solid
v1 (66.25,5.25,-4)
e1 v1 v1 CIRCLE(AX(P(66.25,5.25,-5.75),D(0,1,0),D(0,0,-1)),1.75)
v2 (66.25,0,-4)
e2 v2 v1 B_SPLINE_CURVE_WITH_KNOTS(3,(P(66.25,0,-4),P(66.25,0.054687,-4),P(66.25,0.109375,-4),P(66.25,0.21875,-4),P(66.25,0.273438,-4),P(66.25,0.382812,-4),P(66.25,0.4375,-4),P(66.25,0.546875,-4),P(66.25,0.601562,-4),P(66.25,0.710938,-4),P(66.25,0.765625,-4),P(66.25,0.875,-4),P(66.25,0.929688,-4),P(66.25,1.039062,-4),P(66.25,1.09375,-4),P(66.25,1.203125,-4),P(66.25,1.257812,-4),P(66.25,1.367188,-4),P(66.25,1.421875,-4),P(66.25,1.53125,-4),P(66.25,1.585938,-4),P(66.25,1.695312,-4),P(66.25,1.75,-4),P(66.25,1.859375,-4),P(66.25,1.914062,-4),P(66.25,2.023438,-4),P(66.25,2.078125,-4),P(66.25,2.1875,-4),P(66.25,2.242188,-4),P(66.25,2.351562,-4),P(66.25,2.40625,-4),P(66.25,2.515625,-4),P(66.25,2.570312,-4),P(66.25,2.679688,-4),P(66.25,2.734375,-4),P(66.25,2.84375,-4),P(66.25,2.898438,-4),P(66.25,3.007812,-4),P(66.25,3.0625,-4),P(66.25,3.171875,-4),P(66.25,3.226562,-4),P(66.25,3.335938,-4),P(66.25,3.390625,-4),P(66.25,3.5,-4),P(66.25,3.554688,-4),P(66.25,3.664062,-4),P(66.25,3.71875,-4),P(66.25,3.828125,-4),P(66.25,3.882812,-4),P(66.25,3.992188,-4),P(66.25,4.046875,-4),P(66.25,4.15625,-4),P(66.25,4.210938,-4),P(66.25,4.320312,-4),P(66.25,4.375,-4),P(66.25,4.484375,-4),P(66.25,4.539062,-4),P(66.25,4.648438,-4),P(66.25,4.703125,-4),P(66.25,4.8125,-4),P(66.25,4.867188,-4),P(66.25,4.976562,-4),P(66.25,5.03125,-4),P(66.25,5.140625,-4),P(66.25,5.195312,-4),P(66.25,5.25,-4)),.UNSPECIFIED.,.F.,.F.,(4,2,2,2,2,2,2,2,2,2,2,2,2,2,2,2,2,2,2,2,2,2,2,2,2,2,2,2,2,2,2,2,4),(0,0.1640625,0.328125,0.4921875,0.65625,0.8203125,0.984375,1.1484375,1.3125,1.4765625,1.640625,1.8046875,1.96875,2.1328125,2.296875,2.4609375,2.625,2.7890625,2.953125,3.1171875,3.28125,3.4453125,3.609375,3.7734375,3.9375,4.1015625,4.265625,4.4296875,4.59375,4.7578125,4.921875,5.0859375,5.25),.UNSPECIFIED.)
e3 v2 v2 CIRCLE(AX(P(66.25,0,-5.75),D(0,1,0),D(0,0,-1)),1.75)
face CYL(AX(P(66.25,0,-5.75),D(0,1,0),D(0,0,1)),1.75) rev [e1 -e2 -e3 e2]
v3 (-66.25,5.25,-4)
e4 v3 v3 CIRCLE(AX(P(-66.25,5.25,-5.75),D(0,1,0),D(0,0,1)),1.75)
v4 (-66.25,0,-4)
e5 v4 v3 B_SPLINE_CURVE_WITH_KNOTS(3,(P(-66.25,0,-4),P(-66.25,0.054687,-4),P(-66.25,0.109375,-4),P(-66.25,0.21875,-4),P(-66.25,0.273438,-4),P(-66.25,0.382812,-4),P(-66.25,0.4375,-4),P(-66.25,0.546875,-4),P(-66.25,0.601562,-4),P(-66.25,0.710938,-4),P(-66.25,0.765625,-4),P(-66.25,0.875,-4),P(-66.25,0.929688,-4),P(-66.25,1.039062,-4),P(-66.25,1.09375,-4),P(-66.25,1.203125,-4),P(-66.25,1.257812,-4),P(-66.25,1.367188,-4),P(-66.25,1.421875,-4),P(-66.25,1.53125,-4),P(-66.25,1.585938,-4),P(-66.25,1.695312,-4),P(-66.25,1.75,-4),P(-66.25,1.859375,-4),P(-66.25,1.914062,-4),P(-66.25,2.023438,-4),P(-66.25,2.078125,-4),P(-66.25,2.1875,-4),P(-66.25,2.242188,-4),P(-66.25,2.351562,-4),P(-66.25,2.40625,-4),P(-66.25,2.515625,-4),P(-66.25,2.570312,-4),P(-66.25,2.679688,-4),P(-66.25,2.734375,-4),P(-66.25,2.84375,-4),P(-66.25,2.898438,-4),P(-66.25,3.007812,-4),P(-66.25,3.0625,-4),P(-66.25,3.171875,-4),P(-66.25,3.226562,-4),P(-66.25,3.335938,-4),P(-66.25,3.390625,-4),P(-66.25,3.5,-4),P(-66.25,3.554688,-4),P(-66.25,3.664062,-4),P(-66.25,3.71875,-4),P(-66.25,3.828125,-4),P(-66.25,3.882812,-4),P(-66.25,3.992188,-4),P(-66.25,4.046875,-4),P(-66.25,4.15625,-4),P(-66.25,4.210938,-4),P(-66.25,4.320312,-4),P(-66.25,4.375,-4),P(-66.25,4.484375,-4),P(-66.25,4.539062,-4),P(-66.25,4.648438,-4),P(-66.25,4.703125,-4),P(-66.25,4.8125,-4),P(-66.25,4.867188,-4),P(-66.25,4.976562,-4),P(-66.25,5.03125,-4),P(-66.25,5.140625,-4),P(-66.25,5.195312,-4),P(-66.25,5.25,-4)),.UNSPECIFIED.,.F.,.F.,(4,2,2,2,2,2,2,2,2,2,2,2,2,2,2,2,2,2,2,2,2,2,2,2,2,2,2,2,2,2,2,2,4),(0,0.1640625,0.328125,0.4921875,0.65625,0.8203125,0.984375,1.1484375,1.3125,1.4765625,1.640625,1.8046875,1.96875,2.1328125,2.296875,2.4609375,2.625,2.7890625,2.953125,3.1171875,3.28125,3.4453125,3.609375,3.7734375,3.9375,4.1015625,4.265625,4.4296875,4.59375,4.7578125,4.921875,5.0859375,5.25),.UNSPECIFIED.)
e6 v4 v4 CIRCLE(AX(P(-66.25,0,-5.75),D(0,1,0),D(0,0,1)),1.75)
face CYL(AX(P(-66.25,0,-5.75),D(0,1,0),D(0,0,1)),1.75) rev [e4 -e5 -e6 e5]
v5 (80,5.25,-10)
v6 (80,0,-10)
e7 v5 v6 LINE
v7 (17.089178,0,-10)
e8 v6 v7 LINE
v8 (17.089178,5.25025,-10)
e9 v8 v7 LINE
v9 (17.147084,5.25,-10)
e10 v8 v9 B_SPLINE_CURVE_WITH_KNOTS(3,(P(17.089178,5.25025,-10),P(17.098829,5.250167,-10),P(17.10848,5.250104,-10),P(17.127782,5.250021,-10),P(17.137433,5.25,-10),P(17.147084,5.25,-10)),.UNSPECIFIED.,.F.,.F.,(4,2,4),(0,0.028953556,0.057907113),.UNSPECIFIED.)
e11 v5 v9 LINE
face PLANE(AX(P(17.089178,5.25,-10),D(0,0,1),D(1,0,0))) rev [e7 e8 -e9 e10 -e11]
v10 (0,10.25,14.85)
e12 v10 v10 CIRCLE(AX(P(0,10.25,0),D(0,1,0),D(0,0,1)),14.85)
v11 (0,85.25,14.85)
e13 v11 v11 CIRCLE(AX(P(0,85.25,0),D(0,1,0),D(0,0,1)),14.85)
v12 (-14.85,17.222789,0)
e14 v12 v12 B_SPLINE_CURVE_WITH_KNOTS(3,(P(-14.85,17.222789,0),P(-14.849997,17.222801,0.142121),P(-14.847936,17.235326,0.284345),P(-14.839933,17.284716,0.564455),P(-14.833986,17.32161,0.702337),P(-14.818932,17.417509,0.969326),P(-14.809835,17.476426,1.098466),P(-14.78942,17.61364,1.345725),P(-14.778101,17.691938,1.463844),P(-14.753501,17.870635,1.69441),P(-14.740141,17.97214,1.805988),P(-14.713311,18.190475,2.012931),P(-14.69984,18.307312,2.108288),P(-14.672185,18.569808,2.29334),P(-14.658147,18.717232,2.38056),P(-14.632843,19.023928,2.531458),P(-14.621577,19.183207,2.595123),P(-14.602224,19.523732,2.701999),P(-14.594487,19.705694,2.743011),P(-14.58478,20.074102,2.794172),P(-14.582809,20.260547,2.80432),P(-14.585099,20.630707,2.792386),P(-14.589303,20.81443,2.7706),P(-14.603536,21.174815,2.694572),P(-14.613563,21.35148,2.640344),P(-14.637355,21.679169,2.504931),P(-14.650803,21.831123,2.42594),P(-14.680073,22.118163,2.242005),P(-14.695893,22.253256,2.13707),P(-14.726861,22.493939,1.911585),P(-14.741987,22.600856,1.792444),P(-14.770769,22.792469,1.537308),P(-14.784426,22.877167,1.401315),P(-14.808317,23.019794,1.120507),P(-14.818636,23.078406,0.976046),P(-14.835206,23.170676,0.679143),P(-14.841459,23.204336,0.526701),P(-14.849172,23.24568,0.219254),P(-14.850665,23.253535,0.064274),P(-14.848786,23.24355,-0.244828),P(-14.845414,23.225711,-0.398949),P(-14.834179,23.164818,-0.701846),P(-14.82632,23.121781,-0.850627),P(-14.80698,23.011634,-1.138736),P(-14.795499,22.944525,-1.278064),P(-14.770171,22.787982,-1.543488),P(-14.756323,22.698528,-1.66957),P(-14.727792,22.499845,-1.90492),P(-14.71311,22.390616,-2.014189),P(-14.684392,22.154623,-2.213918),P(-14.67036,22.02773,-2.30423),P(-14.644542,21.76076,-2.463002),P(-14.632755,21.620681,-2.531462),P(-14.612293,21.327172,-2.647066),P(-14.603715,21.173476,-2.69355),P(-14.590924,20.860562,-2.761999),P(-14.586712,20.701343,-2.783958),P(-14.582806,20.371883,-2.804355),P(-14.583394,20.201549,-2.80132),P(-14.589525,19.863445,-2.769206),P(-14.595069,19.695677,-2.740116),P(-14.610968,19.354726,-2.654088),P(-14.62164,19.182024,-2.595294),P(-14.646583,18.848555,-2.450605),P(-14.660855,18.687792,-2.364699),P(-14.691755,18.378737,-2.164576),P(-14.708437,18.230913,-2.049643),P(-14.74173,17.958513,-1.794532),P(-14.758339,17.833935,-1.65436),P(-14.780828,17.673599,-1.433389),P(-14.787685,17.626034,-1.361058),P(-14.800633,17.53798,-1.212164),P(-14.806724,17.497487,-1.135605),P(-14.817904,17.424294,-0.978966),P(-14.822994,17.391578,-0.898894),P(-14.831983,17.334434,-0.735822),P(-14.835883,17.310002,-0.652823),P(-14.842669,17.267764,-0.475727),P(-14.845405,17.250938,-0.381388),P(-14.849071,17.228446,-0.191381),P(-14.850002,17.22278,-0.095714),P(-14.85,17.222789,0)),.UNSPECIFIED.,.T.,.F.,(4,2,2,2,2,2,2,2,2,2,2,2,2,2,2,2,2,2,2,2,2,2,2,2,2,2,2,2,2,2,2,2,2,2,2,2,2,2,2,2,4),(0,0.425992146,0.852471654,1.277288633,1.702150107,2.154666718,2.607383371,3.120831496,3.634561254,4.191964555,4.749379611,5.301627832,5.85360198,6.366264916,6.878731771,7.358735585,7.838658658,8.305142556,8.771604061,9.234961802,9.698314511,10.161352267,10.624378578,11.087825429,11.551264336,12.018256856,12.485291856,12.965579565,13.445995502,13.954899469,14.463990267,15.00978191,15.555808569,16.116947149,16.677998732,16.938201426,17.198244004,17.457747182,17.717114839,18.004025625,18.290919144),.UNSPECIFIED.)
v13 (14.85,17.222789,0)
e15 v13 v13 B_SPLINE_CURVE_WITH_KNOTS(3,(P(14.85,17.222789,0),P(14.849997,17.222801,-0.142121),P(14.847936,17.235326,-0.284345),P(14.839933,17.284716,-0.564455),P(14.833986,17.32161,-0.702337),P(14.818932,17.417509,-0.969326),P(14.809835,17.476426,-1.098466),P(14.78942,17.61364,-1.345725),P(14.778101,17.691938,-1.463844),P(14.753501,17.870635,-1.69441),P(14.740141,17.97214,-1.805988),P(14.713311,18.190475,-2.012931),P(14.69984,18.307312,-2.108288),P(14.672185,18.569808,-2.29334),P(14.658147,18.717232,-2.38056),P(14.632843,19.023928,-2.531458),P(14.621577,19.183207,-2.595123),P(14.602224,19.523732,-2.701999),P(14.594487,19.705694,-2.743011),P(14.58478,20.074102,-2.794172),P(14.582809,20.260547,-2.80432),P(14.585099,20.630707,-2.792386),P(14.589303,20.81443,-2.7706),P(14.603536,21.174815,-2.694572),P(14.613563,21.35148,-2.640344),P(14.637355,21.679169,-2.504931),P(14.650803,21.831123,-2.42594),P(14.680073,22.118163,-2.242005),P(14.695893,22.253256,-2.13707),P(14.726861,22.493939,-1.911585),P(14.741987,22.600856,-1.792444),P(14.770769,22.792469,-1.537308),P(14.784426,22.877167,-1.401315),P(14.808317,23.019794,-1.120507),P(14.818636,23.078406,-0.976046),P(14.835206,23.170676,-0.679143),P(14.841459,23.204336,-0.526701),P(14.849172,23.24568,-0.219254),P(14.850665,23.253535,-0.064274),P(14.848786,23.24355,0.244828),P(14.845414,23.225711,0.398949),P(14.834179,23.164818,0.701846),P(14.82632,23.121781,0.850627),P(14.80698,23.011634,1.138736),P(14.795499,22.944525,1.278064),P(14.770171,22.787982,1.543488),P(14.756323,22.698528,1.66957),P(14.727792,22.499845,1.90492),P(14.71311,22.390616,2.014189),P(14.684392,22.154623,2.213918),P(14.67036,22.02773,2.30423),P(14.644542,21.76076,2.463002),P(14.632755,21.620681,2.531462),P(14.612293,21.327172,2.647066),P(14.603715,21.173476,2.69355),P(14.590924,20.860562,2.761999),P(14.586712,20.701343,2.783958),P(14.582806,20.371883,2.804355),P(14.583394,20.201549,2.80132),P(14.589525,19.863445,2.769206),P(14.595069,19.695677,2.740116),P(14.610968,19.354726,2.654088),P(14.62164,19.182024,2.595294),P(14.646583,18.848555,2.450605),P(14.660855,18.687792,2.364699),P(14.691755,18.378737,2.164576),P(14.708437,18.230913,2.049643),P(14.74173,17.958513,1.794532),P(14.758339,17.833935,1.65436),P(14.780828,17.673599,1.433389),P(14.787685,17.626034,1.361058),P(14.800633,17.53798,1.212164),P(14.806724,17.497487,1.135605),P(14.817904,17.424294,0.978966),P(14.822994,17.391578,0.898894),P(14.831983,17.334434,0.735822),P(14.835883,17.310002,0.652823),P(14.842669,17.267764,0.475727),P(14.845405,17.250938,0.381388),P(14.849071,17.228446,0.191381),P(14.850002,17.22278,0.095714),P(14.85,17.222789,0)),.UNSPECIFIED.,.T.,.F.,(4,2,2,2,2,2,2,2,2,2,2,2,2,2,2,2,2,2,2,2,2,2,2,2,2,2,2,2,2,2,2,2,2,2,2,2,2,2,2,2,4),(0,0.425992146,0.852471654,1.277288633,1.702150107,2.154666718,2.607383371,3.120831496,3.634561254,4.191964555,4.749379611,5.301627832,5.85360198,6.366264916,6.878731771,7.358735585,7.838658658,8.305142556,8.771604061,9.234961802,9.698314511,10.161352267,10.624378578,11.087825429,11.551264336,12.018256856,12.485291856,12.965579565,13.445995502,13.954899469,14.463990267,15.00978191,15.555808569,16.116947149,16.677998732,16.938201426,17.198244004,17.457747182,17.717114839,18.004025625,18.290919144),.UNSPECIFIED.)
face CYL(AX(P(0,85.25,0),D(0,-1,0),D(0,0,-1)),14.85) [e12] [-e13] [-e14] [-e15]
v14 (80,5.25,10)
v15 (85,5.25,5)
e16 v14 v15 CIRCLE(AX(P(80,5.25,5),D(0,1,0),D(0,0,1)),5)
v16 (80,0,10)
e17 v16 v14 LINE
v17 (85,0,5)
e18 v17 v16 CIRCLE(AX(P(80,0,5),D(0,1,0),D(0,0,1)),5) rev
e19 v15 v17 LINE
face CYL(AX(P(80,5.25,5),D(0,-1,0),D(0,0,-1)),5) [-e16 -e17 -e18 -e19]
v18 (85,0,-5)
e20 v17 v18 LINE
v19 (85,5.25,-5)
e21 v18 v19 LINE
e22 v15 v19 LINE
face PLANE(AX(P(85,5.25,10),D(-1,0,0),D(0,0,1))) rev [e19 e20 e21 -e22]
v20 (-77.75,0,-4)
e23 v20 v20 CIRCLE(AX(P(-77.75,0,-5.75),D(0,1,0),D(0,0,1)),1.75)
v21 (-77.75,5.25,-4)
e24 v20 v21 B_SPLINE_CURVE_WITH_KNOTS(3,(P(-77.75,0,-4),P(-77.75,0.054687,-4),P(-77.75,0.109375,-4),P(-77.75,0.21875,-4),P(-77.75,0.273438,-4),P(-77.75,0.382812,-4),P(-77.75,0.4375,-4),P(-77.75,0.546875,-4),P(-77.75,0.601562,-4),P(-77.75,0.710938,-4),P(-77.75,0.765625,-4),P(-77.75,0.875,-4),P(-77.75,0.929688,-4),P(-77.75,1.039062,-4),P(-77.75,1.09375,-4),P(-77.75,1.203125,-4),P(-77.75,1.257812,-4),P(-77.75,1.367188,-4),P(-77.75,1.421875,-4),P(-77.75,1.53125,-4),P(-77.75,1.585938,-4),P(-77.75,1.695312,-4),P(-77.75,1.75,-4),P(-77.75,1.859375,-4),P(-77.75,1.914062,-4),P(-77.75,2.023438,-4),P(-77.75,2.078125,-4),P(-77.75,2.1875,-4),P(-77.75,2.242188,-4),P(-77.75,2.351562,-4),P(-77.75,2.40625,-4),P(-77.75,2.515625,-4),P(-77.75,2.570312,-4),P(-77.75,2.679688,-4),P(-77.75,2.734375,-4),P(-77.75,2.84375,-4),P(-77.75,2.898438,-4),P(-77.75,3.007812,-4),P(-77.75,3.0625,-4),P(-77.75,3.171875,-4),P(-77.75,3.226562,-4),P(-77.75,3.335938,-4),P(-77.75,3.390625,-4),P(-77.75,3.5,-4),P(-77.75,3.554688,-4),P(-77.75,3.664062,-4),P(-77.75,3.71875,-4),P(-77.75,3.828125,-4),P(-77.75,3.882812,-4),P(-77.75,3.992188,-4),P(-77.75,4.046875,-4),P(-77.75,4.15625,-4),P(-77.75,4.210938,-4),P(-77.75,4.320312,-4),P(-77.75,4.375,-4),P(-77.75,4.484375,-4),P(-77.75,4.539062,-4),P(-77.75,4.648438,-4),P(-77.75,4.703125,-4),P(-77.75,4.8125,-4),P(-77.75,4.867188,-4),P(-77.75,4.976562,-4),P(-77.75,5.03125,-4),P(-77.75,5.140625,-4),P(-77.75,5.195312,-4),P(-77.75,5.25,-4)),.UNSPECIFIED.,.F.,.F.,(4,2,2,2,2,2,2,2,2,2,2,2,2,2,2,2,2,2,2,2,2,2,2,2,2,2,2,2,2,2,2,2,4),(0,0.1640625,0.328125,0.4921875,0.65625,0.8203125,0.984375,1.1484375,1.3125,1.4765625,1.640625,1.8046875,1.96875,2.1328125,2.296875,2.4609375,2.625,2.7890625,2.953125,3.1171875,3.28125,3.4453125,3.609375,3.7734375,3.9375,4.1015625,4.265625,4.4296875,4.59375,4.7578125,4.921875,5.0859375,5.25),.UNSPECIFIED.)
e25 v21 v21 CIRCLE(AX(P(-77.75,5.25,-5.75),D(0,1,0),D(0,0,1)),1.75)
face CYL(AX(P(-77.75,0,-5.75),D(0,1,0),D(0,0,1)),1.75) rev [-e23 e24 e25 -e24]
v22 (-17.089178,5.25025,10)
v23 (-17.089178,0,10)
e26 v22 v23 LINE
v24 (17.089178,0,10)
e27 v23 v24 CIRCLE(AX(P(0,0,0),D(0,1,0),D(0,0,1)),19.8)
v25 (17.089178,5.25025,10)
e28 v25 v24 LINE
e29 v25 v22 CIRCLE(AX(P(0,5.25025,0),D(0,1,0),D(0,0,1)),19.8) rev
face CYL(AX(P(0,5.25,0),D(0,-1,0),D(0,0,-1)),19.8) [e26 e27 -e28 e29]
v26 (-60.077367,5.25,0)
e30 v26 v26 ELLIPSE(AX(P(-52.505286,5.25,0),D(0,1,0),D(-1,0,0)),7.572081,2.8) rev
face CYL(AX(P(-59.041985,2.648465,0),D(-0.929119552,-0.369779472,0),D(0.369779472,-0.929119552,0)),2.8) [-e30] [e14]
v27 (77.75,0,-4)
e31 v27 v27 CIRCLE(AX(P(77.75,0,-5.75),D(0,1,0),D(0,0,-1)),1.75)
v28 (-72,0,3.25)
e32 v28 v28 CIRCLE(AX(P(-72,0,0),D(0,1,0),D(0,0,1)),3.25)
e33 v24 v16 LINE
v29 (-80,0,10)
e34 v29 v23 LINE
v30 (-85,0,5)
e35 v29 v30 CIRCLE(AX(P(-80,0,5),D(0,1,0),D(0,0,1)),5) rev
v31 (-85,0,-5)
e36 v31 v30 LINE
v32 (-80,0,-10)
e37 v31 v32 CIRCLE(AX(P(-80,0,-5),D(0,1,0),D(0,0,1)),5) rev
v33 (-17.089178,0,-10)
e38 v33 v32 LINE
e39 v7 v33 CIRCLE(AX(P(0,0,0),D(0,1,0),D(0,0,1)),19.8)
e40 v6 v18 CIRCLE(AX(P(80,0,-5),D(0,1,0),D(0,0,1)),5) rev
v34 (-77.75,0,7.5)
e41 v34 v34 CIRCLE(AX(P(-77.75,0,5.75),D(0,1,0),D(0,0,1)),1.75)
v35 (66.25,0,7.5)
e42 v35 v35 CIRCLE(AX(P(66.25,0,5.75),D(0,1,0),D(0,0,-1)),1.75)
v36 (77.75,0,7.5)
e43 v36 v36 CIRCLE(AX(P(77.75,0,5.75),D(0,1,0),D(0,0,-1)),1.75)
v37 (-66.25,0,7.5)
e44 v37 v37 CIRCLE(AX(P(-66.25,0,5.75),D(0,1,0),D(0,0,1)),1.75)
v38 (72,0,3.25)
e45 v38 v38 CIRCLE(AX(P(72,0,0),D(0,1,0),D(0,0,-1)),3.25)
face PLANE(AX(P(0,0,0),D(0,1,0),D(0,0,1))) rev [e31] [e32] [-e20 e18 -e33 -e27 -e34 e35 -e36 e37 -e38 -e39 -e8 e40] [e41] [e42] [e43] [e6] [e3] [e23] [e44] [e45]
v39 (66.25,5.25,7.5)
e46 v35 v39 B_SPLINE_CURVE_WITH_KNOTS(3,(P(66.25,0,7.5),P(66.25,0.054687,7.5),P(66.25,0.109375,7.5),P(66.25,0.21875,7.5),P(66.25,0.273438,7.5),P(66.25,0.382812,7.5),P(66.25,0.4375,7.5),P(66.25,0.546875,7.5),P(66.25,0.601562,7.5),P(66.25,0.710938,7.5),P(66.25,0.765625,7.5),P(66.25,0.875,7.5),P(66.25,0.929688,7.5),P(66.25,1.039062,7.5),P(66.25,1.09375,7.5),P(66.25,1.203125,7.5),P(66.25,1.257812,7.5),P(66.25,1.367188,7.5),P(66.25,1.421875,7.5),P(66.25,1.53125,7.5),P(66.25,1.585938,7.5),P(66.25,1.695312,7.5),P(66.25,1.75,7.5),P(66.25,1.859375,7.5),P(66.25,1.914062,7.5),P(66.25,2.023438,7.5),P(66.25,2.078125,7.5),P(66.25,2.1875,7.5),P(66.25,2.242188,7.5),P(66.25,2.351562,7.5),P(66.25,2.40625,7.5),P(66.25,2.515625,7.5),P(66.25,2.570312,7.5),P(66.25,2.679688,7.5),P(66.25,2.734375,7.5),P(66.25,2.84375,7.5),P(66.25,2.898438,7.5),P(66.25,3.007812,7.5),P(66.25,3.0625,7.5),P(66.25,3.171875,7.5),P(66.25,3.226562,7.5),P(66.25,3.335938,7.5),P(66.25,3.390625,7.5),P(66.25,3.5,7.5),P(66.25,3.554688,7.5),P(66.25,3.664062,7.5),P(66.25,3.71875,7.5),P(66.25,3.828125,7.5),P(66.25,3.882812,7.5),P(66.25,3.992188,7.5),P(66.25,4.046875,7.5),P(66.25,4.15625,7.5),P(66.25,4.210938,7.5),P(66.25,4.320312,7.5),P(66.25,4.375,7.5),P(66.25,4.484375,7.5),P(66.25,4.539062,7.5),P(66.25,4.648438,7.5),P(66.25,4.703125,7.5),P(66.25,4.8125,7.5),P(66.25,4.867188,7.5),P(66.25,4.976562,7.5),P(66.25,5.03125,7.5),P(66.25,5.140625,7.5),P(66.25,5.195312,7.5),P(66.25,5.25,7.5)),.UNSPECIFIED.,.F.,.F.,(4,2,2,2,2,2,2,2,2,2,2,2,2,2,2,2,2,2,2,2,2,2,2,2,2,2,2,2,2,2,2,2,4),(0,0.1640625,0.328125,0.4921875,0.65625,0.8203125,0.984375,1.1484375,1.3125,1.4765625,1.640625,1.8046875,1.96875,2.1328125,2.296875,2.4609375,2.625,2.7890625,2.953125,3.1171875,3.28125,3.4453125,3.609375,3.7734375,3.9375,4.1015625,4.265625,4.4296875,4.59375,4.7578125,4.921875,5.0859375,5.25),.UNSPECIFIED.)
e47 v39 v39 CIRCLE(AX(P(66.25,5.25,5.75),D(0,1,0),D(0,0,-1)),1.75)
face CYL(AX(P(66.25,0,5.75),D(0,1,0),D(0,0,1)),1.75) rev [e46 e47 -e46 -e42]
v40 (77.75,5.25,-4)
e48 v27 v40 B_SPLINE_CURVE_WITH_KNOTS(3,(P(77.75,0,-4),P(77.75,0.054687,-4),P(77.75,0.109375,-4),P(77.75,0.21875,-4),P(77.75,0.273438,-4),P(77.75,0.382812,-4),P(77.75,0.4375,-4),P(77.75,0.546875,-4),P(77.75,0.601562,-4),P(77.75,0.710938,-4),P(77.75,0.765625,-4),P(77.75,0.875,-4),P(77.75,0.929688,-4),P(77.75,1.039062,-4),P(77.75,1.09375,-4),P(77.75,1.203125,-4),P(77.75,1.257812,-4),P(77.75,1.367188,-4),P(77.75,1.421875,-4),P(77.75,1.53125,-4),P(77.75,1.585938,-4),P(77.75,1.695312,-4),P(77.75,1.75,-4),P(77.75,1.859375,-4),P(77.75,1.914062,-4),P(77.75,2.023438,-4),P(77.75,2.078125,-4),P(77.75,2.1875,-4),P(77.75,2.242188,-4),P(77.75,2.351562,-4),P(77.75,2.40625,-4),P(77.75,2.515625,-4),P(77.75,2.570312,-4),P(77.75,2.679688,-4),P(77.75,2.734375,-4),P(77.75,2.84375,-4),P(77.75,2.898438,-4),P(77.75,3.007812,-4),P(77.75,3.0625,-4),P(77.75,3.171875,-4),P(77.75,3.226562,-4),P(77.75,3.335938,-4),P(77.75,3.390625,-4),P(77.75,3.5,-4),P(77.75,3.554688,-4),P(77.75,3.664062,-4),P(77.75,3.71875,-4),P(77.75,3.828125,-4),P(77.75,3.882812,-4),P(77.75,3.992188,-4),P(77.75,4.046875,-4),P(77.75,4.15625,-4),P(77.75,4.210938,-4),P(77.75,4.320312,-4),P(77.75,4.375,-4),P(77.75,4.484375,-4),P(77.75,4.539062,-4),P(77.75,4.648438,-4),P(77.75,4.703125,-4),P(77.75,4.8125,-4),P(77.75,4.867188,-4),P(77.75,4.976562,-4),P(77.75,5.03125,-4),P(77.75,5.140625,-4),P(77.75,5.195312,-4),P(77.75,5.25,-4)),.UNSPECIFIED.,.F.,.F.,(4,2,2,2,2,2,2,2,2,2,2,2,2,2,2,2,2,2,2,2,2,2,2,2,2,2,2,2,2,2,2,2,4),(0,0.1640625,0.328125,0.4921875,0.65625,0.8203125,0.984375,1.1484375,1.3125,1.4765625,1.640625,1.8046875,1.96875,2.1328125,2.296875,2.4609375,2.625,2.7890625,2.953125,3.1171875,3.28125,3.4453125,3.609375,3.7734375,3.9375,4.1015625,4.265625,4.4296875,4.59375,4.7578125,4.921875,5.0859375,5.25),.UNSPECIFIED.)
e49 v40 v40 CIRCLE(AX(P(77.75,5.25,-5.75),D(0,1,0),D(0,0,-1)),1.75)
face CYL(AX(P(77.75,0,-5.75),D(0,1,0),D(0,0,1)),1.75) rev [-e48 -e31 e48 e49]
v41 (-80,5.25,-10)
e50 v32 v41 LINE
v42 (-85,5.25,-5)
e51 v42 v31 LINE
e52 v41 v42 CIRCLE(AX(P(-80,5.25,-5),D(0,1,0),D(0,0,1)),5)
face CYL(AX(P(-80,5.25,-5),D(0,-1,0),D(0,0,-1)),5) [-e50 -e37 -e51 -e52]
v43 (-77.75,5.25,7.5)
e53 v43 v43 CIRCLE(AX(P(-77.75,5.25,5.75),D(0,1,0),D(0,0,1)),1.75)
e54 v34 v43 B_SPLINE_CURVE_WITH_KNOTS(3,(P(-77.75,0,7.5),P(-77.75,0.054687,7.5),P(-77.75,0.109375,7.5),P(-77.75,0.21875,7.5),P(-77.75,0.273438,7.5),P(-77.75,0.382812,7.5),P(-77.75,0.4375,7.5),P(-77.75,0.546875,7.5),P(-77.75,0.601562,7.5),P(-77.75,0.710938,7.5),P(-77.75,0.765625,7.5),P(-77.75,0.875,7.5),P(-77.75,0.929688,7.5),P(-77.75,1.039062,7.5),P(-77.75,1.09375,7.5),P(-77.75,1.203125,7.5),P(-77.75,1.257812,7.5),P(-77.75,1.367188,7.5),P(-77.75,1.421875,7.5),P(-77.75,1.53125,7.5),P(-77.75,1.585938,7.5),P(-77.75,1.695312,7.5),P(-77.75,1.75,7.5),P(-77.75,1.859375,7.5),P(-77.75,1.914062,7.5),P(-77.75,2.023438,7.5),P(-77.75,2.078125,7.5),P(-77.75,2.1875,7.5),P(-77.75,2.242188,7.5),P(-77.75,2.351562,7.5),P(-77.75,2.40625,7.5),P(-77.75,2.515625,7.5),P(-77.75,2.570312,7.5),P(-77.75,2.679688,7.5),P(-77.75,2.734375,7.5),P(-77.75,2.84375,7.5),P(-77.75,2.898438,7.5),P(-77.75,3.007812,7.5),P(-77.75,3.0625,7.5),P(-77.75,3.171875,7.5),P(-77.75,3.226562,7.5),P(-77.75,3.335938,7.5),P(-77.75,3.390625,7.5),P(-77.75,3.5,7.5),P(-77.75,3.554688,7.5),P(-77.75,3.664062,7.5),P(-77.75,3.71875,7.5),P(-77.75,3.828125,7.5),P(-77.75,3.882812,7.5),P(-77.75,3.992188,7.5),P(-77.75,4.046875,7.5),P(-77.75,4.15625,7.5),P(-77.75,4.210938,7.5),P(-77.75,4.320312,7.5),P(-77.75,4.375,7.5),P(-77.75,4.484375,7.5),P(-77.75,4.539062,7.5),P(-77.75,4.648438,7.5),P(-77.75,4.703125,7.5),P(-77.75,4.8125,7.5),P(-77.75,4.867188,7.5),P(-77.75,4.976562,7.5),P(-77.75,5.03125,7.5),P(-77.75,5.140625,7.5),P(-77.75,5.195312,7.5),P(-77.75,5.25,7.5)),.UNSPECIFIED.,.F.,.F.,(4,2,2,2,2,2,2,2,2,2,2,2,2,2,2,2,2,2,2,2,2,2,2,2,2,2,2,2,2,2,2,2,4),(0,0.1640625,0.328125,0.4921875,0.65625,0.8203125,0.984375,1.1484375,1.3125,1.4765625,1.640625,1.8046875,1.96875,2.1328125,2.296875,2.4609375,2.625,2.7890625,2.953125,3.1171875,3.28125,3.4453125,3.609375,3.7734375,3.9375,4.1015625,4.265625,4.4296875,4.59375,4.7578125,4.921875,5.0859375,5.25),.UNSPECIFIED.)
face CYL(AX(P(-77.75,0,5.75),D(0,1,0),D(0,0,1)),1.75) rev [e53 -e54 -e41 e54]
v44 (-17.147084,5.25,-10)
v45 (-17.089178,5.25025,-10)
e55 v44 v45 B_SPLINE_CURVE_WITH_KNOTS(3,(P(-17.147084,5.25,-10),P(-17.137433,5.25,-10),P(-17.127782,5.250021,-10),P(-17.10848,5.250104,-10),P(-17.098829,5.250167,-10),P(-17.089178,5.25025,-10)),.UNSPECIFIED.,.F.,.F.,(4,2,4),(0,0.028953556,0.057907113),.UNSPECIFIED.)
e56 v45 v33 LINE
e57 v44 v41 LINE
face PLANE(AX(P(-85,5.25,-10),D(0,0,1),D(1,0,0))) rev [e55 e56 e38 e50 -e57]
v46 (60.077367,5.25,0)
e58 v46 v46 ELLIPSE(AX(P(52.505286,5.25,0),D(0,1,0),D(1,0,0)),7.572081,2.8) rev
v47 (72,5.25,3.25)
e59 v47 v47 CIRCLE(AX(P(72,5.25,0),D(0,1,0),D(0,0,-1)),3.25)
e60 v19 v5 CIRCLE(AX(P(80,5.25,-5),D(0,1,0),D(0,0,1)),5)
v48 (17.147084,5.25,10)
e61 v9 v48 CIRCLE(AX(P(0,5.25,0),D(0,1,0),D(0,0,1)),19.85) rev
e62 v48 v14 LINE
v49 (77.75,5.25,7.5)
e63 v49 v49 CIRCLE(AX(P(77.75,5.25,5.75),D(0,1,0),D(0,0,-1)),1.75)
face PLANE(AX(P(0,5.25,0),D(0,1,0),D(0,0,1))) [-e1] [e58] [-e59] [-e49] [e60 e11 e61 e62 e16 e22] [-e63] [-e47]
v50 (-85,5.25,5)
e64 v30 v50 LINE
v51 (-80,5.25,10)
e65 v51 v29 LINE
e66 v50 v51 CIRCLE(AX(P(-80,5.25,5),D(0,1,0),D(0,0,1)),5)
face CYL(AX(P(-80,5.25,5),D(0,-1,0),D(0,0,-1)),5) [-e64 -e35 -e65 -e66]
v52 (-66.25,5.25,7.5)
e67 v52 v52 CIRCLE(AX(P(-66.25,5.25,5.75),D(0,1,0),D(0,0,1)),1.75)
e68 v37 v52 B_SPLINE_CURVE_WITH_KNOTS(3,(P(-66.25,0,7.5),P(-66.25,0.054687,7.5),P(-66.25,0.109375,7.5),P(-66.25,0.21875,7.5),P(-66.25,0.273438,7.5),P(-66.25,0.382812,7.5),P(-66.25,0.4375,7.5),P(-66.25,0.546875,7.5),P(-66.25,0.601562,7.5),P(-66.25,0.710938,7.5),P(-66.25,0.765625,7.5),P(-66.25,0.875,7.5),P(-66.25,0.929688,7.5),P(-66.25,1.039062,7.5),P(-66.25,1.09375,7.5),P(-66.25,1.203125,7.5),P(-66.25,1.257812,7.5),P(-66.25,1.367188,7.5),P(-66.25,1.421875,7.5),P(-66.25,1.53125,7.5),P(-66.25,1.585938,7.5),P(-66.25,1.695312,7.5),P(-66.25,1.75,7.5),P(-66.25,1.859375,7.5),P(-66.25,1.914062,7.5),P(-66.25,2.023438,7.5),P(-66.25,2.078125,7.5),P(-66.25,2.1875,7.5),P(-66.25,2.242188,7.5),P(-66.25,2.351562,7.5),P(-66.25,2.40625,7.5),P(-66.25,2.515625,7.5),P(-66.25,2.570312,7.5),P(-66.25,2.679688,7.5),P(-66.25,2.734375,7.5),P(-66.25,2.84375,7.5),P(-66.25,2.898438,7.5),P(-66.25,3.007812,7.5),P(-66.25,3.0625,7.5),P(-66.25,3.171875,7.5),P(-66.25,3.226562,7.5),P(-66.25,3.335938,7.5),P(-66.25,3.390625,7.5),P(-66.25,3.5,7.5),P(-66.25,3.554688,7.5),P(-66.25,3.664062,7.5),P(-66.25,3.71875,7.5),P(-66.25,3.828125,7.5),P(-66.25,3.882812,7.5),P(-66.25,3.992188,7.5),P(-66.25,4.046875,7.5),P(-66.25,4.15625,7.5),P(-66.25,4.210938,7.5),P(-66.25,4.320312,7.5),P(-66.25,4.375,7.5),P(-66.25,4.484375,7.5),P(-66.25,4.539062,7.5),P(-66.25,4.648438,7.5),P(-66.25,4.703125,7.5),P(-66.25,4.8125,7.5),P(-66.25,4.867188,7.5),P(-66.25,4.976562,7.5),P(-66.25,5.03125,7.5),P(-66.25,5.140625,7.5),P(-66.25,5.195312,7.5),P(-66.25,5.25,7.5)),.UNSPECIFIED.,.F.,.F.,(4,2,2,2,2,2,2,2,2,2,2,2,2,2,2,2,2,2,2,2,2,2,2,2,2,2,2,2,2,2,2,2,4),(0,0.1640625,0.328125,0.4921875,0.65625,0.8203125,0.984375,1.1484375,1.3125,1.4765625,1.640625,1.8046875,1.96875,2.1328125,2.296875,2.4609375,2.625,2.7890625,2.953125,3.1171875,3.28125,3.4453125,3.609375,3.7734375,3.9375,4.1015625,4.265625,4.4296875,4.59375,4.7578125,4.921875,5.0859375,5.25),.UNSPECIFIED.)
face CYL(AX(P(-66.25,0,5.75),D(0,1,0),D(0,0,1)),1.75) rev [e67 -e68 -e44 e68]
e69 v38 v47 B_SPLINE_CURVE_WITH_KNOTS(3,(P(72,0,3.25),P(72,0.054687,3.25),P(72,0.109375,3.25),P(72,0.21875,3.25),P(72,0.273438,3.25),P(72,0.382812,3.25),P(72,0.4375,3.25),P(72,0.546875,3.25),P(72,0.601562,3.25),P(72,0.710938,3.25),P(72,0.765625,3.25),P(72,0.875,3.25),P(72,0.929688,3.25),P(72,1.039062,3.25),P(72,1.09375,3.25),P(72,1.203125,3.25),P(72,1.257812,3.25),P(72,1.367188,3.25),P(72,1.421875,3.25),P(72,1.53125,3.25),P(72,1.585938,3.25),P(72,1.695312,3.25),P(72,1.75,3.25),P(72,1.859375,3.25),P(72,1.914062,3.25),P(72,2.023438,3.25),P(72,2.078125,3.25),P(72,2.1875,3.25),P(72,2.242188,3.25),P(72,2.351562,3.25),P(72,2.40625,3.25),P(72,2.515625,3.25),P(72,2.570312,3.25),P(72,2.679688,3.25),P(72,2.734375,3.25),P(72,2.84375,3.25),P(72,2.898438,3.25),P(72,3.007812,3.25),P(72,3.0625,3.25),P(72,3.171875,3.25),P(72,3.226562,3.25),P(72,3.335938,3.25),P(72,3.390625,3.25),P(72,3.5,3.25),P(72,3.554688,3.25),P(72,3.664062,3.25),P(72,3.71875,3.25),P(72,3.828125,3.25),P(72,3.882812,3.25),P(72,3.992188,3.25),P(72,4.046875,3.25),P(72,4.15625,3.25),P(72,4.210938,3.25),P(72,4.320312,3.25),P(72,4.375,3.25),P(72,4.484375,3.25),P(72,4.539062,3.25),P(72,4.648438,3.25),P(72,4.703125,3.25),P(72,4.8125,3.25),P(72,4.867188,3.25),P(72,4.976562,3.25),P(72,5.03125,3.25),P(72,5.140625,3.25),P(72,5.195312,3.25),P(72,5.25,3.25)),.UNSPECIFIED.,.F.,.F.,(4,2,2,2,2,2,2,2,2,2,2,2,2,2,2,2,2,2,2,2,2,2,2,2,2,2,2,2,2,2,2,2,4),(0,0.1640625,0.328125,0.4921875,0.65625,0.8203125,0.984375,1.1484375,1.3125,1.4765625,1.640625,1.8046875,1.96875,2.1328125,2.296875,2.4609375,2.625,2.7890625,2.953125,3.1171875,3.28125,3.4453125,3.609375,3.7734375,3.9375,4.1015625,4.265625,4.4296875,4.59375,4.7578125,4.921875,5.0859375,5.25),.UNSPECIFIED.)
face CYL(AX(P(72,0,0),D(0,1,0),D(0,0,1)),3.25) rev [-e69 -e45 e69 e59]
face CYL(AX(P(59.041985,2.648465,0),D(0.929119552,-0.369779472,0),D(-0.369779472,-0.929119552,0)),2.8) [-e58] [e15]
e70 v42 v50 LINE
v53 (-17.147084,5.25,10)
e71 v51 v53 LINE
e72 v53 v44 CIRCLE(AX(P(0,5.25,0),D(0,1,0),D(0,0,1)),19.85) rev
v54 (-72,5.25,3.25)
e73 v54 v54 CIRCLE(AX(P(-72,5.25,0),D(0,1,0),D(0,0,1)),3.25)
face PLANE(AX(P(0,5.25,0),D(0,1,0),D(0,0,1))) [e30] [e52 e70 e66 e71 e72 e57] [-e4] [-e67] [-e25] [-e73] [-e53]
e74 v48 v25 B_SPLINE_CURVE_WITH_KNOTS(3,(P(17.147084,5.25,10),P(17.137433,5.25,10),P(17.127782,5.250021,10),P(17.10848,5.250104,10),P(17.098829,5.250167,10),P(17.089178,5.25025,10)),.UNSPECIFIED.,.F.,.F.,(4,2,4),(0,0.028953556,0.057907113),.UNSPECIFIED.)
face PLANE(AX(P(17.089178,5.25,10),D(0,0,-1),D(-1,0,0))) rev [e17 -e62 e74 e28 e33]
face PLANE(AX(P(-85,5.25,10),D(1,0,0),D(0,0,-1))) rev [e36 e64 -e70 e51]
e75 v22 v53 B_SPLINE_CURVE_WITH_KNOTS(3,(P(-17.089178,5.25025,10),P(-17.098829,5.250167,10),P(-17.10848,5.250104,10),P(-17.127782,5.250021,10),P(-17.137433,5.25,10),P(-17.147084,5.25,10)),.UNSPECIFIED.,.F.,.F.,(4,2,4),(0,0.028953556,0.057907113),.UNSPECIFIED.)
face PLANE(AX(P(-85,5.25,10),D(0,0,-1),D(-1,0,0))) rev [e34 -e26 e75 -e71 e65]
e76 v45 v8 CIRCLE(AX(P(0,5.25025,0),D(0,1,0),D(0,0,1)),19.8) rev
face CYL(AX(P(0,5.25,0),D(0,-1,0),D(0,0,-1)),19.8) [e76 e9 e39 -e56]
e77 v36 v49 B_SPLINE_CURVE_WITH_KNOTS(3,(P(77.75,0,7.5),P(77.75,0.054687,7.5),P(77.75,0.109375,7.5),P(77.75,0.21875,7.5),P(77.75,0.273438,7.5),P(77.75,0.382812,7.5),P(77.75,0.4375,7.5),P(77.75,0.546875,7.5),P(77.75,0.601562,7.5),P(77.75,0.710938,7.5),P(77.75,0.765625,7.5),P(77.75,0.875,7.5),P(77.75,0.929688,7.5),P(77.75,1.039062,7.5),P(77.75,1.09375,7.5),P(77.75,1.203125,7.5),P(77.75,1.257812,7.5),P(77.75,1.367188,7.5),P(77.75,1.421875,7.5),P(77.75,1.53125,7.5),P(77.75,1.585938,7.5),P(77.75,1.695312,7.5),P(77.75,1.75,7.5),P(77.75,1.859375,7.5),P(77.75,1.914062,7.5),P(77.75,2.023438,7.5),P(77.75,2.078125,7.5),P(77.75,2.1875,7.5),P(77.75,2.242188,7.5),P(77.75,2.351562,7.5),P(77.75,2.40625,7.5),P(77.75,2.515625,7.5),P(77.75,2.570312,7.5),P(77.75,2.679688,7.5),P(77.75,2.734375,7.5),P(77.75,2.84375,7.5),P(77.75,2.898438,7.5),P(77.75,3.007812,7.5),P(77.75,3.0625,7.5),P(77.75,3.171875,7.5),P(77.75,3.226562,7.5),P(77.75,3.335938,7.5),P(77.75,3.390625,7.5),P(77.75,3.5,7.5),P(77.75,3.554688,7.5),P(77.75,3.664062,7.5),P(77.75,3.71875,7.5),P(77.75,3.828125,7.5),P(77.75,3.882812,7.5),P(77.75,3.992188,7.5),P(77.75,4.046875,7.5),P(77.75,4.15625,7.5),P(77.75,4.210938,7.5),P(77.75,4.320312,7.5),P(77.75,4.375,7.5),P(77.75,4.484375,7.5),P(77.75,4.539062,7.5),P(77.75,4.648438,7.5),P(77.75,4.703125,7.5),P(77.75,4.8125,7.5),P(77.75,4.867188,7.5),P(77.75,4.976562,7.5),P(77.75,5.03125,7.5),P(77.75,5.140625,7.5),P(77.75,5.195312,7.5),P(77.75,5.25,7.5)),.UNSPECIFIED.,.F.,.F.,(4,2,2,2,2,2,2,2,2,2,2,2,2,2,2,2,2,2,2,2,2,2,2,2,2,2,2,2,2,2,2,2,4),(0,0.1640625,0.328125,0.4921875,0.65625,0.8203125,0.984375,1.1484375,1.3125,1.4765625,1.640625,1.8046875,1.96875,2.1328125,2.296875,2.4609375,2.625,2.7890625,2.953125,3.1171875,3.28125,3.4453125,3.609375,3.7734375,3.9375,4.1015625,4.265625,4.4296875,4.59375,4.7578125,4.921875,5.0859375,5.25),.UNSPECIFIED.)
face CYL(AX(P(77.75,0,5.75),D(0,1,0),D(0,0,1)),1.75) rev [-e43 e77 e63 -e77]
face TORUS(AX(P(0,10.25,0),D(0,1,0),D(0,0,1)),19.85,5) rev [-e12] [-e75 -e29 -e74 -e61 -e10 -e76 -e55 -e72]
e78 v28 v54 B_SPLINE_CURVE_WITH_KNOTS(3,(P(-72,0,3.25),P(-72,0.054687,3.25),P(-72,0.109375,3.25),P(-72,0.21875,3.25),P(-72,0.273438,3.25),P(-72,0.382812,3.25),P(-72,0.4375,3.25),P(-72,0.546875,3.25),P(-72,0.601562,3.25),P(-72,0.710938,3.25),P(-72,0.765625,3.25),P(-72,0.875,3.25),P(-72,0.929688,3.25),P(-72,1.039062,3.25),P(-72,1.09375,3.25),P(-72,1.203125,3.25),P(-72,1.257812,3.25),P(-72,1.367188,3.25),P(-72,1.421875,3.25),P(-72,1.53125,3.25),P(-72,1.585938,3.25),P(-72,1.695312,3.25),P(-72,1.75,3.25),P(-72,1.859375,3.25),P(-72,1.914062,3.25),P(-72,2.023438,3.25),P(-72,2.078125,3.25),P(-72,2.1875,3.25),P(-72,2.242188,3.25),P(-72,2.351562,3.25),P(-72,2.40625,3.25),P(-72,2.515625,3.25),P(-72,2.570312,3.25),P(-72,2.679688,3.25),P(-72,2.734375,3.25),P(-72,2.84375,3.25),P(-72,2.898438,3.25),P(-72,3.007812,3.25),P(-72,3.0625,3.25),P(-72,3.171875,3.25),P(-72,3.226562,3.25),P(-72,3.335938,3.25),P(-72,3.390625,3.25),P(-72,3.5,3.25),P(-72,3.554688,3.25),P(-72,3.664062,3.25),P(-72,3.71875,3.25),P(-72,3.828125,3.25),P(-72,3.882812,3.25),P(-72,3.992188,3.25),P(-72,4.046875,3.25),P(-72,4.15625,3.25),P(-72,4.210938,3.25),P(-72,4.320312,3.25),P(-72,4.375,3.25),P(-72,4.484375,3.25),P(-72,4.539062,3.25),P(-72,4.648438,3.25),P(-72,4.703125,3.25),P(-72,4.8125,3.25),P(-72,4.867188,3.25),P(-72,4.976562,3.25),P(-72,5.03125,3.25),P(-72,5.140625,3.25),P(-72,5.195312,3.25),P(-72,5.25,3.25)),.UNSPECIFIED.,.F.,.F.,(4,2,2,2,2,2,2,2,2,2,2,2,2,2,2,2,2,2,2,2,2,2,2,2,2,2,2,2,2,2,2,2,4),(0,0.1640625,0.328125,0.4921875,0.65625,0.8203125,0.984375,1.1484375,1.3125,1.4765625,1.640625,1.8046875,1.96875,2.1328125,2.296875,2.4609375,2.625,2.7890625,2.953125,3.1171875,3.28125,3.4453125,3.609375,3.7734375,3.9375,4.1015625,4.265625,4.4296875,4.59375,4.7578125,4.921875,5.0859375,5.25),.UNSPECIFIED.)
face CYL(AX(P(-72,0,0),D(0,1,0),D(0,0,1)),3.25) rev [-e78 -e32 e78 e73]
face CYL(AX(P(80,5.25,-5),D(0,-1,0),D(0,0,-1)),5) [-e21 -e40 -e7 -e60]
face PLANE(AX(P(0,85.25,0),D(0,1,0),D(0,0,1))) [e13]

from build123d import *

# Parameters (mm, degrees)
BOSS_EXTRUDE1_DEPTH = 5.25
SKETCH3_R           = 14.850000000000001
BOSS_EXTRUDE2_DEPTH = 80
SKETCH2_R           = 1.749999999999997
SKETCH2_R_2         = 3.250000000000007
CUT_EXTRUDE1_DEPTH  = 119.39358090707452
FILLET8_R           = 5
FILLET9_R           = 5


with BuildPart() as part:
    # Sketch1 → Boss-Extrude1 (new body)
    with BuildSketch(Plane(origin=(0, 0, 0), x_dir=(1, 0, 0), z_dir=(0, 1, 0))):
        with BuildLine():
            Line((-85, -10.000000000000002), (-17.089177862027185, -10))
            ThreePointArc((-17.089177862027185, -10), (1.11e-15, -19.8), (17.089177862027185, -10))
            Line((17.089177862027185, -10), (85, -10.000000000000002))
            Line((85, -10.000000000000002), (85, 10))
            Line((85, 10), (17.089177862027185, 10))
            ThreePointArc((17.089177862027185, 10), (1.11e-15, 19.8), (-17.089177862027185, 10))
            Line((-17.089177862027185, 10), (-85, 10))
            Line((-85, 10), (-85, -10.000000000000002))
        make_face()
    extrude(amount=BOSS_EXTRUDE1_DEPTH)

    # Sketch3 → Boss-Extrude2 (add)
    with BuildSketch(Plane(origin=(0, 5.25, 0), x_dir=(1, 0, 0), z_dir=(0, 1, 0))):
        with Locations(Location((0, 0, 0), (0, 0, 270))):
            Circle(SKETCH3_R)
    extrude(amount=BOSS_EXTRUDE2_DEPTH)

    # Sketch2 → Cut-Extrude1 (cut, through all)
    with BuildSketch(Plane(origin=(0, 5.25, 0), x_dir=(1, 0, 0), z_dir=(0, 1, 0))):
        with Locations(Location((-77.75, 5.7499999999999964, 0), (0, 0, 270))):
            Circle(SKETCH2_R)
        with Locations(Location((-66.25, 5.7499999999999964, 0), (0, 0, 270))):
            Circle(SKETCH2_R)
        with Locations(Location((-66.25, -5.75, 0), (0, 0, 270))):
            Circle(SKETCH2_R)
        with Locations(Location((-77.75, -5.75, 0), (0, 0, 270))):
            Circle(SKETCH2_R)
        with Locations(Location((77.75, -5.75, 0), (0, 0, 270))):
            Circle(SKETCH2_R)
        with Locations(Location((66.25, -5.75, 0), (0, 0, 270))):
            Circle(SKETCH2_R)
        with Locations(Location((77.75, 5.7499999999999964, 0), (0, 0, 270))):
            Circle(SKETCH2_R)
        with Locations(Location((66.25, 5.7499999999999964, 0), (0, 0, 270))):
            Circle(SKETCH2_R)
        with Locations(Location((-72, -2.87e-15, 0), (0, 0, 270))):
            Circle(SKETCH2_R_2)
        with Locations(Location((72, -2.87e-15, 0), (0, 0, 270))):
            Circle(SKETCH2_R_2)
    extrude(amount=-CUT_EXTRUDE1_DEPTH, mode=Mode.SUBTRACT)

    # Sketch5 one side → Revolve1 (revolve)
    with BuildSketch(Plane.XY, mode=Mode.PRIVATE) as revolve1_sk:
        Polygon((-14.850000000000001, 20.23639427704437), (-14.850000000000001, 23.25), (-60.077367189450115, 5.2500000000000036), (-59.041984669000975, 2.648465253672675), align=None)
    revolve1 = revolve(revolve1_sk.sketch.rotate(Axis((-59.041984669000975, 2.648465253672677, 0), (0.9291195522597585, 0.3697794715889807, 0)), 180), axis=Axis((-59.041984669000975, 2.648465253672677, 0), (0.9291195522597585, 0.3697794715889807, 0)))

    # Fillet8
    fillet8_edges = [part.edges().sort_by_distance(p)[0] for p in [
        (85, 2.625, -10),
        (85, 2.625, 10.000000000000002),
        (-85, 2.625, 10.000000000000002),
        (-85, 2.625, -10),
    ]]
    fillet(fillet8_edges, radius=FILLET8_R)

    # Mirror1: Revolve1 across plane
    add(revolve1.mirror(Plane.ZY))

    # Fillet9
    # the kernel refuses this fillet: 5 mm, written as the material it adds along each edge
    with BuildSketch(Plane(origin=(0, 5.25, 0), x_dir=(-1.8e-16, 0, 1), z_dir=(-1, 0, -1.8e-16))) as fillet9_piece_1:
        with BuildLine():
            CenterArc((19.85, 4.99974999375026), FILLET9_R, 180, 89.42703265514302)
            Line((14.850000000000001, 4.99974999375026), (14.750000000000002, 4.99974999375026))
            Line((14.750000000000002, 4.99974999375026), (14.750000000000002, 0))
            Line((14.750000000000002, 0), (14.850000000000001, -0.09999999999999964))
            ThreePointArc((14.850000000000001, -0.09999999999999964), (17.32500000000001, -0.09999999999999964), (19.799000000000017, -0.09999499987442118))
            Line((19.799000000000017, -0.09999499987442118), (19.80000000000002, 5.7288e-13))
        make_face()
    revolve(axis=Axis((0, 5.25, 0), (0, 1, 0)))


solid = part.part
